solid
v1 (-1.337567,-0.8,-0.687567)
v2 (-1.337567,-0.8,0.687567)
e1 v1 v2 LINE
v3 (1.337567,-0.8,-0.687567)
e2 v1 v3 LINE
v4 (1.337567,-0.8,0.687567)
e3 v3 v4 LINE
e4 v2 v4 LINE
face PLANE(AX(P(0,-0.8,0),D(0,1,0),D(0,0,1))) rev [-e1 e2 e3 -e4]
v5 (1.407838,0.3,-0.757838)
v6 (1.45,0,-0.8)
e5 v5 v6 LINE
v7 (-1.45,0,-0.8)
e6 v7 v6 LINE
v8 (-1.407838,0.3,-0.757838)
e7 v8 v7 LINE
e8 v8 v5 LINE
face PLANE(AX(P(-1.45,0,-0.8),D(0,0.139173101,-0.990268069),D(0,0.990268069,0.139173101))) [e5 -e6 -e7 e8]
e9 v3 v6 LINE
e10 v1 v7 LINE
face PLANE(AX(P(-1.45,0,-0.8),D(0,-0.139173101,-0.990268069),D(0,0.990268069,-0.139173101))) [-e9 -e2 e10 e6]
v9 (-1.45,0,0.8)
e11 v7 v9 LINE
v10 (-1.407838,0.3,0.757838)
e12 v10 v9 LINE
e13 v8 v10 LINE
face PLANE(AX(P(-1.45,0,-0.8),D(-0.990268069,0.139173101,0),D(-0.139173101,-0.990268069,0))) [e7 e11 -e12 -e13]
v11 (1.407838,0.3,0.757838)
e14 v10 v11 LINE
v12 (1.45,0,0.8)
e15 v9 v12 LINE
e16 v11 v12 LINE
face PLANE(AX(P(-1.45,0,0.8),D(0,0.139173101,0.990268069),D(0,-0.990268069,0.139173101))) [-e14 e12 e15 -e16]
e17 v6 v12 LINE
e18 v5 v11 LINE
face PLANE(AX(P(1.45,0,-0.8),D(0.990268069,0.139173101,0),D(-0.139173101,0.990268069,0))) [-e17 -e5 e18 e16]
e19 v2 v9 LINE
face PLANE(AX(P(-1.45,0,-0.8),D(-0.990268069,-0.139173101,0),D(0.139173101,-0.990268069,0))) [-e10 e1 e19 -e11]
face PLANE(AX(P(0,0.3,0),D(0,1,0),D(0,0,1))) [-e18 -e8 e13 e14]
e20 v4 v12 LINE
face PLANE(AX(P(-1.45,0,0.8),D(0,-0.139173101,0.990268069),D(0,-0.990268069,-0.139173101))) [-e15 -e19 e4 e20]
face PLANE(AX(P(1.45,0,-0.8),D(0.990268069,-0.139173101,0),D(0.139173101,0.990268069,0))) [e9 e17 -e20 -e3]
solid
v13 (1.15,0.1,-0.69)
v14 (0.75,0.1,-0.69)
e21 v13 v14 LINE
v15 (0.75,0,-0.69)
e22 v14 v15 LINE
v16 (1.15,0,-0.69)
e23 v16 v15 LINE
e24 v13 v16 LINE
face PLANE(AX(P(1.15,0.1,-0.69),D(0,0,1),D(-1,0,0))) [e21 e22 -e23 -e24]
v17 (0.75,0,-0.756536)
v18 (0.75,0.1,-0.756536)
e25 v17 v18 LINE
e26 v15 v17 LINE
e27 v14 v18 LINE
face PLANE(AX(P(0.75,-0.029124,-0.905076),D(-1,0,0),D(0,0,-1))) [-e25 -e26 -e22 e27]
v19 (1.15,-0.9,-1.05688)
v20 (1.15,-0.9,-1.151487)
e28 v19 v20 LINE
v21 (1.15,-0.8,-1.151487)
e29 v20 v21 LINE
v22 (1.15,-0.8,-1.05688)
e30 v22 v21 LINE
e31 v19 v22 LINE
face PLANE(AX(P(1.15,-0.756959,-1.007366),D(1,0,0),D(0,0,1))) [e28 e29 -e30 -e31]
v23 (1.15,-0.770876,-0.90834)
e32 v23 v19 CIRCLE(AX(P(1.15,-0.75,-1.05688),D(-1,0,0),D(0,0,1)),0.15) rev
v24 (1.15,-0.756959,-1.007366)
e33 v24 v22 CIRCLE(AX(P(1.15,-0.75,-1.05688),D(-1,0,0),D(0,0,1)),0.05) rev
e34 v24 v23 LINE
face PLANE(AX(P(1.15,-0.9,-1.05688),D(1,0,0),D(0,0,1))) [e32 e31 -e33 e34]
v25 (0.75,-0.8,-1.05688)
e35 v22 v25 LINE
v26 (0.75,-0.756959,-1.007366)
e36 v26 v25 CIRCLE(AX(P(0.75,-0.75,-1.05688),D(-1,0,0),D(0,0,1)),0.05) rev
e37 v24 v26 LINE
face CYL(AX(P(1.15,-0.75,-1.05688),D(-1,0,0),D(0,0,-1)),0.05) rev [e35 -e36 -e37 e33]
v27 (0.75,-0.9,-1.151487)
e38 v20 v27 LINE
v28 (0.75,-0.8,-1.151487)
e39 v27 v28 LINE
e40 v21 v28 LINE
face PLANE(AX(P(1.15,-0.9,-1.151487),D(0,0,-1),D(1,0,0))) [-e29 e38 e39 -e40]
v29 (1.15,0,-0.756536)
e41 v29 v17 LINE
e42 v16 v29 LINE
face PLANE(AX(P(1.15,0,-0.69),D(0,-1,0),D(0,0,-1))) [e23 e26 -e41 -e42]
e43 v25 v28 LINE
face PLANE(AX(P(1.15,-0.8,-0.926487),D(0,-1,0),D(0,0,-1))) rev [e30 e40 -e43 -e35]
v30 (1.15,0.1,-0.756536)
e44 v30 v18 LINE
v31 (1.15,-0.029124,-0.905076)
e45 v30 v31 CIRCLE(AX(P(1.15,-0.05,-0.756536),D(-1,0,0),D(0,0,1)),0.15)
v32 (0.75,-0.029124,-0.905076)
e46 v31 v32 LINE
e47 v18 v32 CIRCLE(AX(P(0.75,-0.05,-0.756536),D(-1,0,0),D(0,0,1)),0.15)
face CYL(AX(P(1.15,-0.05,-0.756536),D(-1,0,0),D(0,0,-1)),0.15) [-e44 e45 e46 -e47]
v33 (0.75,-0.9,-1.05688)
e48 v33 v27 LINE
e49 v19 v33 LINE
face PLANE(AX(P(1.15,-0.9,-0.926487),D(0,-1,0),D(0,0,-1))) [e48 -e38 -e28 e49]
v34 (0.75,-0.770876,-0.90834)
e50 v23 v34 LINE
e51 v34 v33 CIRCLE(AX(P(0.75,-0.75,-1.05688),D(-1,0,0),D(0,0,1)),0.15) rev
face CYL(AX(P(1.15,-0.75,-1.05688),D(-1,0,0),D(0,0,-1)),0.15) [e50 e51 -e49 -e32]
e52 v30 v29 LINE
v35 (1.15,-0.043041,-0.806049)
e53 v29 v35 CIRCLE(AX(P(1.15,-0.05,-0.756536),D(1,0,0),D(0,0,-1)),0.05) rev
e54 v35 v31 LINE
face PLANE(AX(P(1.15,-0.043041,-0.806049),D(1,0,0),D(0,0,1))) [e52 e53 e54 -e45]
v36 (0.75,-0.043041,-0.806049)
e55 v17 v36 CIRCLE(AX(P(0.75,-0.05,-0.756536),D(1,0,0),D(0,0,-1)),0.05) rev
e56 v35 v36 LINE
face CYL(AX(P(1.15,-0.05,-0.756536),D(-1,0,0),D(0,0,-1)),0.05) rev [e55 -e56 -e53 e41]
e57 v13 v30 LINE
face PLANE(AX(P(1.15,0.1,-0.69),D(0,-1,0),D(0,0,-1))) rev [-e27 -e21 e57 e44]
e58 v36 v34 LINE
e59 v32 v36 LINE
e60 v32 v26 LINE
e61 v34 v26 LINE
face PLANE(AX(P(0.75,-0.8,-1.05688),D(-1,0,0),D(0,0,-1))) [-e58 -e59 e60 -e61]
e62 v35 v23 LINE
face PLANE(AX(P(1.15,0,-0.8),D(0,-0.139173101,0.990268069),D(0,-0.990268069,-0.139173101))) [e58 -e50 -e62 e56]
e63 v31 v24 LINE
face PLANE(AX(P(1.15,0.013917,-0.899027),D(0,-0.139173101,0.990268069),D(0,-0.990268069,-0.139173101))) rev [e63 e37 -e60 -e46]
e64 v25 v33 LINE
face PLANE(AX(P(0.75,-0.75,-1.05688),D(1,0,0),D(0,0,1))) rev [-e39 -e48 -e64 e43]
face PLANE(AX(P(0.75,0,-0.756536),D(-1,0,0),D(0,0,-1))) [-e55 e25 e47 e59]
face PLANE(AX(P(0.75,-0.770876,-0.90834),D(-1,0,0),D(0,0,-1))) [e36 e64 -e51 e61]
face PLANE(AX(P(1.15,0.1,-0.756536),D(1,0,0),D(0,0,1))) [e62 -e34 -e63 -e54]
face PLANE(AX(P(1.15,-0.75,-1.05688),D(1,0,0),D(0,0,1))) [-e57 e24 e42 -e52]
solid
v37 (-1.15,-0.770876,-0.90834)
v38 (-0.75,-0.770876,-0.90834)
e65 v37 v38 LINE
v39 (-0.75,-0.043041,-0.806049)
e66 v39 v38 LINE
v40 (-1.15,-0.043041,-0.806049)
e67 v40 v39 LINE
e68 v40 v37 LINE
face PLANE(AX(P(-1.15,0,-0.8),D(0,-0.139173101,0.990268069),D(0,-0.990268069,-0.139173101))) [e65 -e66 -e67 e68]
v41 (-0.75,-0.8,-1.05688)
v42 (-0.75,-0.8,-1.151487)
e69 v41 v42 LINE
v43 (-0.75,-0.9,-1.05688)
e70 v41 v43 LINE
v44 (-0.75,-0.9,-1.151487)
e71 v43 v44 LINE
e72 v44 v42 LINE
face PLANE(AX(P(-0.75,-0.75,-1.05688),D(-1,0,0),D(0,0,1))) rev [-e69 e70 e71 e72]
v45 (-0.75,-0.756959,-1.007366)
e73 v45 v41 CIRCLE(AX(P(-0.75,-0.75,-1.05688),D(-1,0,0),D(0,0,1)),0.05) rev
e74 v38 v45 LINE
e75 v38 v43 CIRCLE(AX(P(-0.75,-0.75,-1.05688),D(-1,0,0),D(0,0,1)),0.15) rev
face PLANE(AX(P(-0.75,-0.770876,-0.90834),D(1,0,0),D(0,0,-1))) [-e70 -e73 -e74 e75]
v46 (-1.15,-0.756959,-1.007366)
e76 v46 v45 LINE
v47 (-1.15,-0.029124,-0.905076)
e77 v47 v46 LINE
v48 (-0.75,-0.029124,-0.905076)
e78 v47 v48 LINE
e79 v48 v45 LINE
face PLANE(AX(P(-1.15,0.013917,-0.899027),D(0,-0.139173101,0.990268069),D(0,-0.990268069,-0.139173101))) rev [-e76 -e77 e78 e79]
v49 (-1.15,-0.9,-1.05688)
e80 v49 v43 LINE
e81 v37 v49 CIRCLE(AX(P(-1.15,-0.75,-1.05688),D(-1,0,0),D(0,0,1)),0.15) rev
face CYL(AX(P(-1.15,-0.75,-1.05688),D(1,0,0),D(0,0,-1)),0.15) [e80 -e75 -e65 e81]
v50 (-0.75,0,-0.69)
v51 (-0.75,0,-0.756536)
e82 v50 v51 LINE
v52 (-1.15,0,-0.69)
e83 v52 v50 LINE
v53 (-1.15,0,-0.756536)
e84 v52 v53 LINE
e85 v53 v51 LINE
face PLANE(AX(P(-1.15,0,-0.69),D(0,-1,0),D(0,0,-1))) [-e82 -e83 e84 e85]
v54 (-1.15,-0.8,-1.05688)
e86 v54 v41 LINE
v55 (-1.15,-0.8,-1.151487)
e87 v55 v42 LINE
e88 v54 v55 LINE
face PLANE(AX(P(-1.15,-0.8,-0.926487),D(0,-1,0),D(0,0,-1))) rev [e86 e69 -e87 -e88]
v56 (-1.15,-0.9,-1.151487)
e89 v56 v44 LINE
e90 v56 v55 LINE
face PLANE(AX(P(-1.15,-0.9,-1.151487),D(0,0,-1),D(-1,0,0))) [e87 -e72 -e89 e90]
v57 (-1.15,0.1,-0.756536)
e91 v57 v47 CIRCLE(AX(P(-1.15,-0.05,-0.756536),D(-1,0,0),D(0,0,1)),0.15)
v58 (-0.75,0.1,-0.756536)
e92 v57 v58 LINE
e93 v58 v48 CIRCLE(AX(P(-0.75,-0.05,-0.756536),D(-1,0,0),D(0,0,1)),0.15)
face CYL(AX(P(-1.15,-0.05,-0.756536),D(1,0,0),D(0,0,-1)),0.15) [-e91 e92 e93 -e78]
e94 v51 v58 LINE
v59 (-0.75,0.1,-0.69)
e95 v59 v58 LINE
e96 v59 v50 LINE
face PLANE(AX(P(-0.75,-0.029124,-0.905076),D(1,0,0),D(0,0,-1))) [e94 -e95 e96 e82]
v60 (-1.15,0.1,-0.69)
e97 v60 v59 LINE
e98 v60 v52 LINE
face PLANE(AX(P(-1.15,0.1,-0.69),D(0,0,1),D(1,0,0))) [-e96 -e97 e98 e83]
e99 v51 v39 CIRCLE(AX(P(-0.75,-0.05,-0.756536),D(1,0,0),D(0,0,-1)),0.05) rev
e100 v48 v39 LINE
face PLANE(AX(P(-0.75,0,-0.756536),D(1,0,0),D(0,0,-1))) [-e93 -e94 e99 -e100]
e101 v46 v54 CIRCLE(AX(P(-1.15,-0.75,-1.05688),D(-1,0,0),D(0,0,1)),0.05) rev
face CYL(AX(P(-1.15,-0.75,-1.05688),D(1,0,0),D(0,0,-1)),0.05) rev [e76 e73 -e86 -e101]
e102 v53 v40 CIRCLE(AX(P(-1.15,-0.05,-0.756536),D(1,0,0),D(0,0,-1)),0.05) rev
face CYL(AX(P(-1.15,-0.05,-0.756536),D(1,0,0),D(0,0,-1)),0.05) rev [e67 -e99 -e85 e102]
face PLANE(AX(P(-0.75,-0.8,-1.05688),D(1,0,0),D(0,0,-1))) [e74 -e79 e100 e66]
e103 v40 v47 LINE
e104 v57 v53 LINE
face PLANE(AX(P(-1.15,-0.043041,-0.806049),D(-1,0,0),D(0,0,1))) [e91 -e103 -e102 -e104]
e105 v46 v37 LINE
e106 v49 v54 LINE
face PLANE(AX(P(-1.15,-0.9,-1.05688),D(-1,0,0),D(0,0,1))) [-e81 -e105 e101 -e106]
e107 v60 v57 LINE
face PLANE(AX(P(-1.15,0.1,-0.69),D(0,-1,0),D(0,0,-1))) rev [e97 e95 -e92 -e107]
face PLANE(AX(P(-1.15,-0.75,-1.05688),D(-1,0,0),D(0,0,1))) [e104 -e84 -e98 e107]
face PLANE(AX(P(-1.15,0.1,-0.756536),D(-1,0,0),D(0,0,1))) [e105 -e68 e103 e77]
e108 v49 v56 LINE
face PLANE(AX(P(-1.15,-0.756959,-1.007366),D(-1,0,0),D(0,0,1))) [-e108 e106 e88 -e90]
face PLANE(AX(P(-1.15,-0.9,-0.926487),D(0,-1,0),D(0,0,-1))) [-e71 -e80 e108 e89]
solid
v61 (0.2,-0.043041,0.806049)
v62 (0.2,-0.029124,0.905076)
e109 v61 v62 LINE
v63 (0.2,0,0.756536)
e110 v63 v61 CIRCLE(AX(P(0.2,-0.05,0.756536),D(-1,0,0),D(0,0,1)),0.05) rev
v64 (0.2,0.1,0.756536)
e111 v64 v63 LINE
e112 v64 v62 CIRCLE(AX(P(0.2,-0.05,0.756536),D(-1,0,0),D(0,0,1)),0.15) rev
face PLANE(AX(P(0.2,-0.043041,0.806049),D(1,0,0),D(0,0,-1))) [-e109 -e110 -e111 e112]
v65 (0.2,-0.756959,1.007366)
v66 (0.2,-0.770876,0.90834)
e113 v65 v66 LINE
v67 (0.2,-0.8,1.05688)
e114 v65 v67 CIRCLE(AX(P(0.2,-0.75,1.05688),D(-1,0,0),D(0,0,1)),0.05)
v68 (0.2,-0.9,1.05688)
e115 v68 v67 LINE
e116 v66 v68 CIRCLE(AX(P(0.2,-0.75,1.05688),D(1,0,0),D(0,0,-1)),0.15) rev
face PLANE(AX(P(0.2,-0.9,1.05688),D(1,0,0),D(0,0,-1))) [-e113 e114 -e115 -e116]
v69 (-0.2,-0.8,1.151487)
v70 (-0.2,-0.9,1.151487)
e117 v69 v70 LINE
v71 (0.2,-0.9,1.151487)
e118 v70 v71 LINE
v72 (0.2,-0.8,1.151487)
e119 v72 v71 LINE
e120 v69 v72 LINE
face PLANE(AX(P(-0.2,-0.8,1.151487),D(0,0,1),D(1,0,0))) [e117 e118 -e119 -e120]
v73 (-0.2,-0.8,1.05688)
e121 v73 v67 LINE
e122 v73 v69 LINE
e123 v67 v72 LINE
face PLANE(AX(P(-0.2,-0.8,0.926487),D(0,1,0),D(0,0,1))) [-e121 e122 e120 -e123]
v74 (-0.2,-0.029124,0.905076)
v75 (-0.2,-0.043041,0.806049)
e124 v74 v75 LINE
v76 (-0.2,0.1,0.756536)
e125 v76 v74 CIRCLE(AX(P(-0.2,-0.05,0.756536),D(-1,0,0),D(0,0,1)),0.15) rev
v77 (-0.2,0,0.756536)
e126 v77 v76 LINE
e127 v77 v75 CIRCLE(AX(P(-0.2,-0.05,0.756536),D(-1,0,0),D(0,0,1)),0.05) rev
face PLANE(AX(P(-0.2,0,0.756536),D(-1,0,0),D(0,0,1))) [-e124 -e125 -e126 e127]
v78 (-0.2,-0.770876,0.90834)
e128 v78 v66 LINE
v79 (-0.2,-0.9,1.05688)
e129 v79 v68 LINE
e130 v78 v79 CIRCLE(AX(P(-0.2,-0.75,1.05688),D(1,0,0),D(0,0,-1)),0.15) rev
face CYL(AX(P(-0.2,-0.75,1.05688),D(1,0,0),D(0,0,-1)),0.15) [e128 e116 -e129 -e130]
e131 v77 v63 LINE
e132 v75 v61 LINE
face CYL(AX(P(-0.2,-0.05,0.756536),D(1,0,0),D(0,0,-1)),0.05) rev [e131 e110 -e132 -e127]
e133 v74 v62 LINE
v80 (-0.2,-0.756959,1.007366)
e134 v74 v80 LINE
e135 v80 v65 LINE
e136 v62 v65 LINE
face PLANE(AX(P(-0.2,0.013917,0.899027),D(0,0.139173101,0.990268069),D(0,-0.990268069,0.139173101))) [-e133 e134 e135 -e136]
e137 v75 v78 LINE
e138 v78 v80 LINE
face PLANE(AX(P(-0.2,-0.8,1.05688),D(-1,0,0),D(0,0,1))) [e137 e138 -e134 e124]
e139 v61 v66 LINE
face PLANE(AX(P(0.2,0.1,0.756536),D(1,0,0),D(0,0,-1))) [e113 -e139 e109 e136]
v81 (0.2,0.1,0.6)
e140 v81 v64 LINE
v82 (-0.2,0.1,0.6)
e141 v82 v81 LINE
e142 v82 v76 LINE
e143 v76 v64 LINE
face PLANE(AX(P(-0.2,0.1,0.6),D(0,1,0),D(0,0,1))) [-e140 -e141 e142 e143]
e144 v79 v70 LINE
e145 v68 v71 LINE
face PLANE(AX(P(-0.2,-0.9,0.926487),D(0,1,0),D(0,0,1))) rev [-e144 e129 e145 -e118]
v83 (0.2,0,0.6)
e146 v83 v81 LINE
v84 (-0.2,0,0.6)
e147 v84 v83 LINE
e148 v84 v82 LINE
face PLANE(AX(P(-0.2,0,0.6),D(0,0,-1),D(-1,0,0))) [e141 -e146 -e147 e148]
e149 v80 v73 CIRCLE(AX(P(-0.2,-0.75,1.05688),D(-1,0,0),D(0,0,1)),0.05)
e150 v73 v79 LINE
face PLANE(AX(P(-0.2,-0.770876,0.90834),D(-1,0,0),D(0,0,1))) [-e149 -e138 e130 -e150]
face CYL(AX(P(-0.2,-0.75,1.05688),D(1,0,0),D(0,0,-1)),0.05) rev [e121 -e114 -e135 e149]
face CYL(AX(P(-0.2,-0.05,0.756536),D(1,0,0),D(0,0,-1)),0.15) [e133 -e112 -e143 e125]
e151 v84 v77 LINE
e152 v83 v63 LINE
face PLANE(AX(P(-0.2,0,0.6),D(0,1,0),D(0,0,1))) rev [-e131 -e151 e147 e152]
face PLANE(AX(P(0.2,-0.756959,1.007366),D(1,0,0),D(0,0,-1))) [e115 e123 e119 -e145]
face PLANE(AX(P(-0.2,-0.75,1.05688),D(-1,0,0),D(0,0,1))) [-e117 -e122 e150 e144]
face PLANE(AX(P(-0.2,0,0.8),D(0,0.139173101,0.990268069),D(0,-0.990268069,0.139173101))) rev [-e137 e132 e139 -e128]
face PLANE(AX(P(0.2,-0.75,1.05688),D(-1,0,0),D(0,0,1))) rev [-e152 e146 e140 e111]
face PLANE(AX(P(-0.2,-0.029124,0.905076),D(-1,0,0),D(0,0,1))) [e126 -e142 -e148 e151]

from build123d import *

# Parameters (mm, degrees)
SKETCH1_W                     = 2.9
SKETCH1_H                     = 1.6
BOSS_EXTRUDE1_DEPTH           = 0.3
BOSS_EXTRUDE1_TAPER           = 8
BOSS_EXTRUDE1_OTHER_WAY_DEPTH = 0.8
BOSS_EXTRUDE1_OTHER_WAY_TAPER = 8
BASE_FLANGE2_DEPTH            = 0.2
BASE_FLANGE3_DEPTH            = 0.2


# Sheet-metal steps are written as plain solids
with BuildPart() as part:
    # Sketch1 → Boss-Extrude1 (new body)
    with BuildSketch(Plane(origin=(0, 0, 0), x_dir=(1, 0, 0), z_dir=(0, 1, 0))):
        Rectangle(SKETCH1_W, SKETCH1_H)
    extrude(amount=BOSS_EXTRUDE1_DEPTH, taper=BOSS_EXTRUDE1_TAPER)

    # Sketch1 → Boss-Extrude1 other way (add)
    with BuildSketch(Plane(origin=(0, 0, 0), x_dir=(1, 0, 0), z_dir=(0, 1, 0))):
        Rectangle(SKETCH1_W, SKETCH1_H)
    extrude(amount=-BOSS_EXTRUDE1_OTHER_WAY_DEPTH, taper=BOSS_EXTRUDE1_OTHER_WAY_TAPER)


with BuildPart() as body_2:
    # Sketch2 → Base-Flange2 (new, symmetric)
    with BuildSketch(Plane.ZY):
        with BuildLine():
            Line((0.6, 0), (0.756535663, 0))
            ThreePointArc((0.756535663, 0), (0.789338615, -0.012264521), (0.806049067, -0.043041345))
            Line((0.806049067, -0.043041345), (0.908339552, -0.770875965))
            ThreePointArc((0.908339552, -0.770875965), (0.958470908, -0.863206437), (1.056879762, -0.9))
            Line((1.056879762, -0.9), (1.151486751, -0.9))
            Line((1.151486751, -0.9), (1.151486751, -0.8))
            Line((1.151486751, -0.8), (1.056879762, -0.8))
            ThreePointArc((1.056879762, -0.8), (1.02407681, -0.787735479), (1.007366358, -0.756958655))
            Line((1.007366358, -0.756958655), (0.905075873, -0.029124035))
            ThreePointArc((0.905075873, -0.029124035), (0.854944517, 0.063206437), (0.756535663, 0.1))
            Line((0.756535663, 0.1), (0.6, 0.1))
            Line((0.6, 0.1), (0.6, 0))
        make_face()
    extrude(amount=BASE_FLANGE2_DEPTH, both=True)


with BuildPart() as body_3:
    # Sketch11 → Base-Flange3 (new, symmetric)
    with BuildSketch(Plane.ZY.offset(0.95)):
        with BuildLine():
            Line((-0.69, 0), (-0.756535663, 0))
            ThreePointArc((-0.756535663, 0), (-0.789338615, -0.012264521), (-0.806049067, -0.043041345))
            Line((-0.806049067, -0.043041345), (-0.908339552, -0.770875965))
            ThreePointArc((-0.908339552, -0.770875965), (-0.958470908, -0.863206437), (-1.056879762, -0.9))
            Line((-1.056879762, -0.9), (-1.151486751, -0.9))
            Line((-1.151486751, -0.9), (-1.151486751, -0.8))
            Line((-1.151486751, -0.8), (-1.056879762, -0.8))
            ThreePointArc((-1.056879762, -0.8), (-1.02407681, -0.787735479), (-1.007366358, -0.756958655))
            Line((-1.007366358, -0.756958655), (-0.905075873, -0.029124035))
            ThreePointArc((-0.905075873, -0.029124035), (-0.854944517, 0.063206437), (-0.756535663, 0.1))
            Line((-0.756535663, 0.1), (-0.69, 0.1))
            Line((-0.69, 0.1), (-0.69, 0))
        make_face()
    extrude(amount=BASE_FLANGE3_DEPTH, both=True)


with BuildPart() as body_4:
    # Mirror1: mirrored copy
    add(body_3.part.mirror(Plane.ZY))


solid = Compound([part.part, body_2.part, body_3.part, body_4.part])
